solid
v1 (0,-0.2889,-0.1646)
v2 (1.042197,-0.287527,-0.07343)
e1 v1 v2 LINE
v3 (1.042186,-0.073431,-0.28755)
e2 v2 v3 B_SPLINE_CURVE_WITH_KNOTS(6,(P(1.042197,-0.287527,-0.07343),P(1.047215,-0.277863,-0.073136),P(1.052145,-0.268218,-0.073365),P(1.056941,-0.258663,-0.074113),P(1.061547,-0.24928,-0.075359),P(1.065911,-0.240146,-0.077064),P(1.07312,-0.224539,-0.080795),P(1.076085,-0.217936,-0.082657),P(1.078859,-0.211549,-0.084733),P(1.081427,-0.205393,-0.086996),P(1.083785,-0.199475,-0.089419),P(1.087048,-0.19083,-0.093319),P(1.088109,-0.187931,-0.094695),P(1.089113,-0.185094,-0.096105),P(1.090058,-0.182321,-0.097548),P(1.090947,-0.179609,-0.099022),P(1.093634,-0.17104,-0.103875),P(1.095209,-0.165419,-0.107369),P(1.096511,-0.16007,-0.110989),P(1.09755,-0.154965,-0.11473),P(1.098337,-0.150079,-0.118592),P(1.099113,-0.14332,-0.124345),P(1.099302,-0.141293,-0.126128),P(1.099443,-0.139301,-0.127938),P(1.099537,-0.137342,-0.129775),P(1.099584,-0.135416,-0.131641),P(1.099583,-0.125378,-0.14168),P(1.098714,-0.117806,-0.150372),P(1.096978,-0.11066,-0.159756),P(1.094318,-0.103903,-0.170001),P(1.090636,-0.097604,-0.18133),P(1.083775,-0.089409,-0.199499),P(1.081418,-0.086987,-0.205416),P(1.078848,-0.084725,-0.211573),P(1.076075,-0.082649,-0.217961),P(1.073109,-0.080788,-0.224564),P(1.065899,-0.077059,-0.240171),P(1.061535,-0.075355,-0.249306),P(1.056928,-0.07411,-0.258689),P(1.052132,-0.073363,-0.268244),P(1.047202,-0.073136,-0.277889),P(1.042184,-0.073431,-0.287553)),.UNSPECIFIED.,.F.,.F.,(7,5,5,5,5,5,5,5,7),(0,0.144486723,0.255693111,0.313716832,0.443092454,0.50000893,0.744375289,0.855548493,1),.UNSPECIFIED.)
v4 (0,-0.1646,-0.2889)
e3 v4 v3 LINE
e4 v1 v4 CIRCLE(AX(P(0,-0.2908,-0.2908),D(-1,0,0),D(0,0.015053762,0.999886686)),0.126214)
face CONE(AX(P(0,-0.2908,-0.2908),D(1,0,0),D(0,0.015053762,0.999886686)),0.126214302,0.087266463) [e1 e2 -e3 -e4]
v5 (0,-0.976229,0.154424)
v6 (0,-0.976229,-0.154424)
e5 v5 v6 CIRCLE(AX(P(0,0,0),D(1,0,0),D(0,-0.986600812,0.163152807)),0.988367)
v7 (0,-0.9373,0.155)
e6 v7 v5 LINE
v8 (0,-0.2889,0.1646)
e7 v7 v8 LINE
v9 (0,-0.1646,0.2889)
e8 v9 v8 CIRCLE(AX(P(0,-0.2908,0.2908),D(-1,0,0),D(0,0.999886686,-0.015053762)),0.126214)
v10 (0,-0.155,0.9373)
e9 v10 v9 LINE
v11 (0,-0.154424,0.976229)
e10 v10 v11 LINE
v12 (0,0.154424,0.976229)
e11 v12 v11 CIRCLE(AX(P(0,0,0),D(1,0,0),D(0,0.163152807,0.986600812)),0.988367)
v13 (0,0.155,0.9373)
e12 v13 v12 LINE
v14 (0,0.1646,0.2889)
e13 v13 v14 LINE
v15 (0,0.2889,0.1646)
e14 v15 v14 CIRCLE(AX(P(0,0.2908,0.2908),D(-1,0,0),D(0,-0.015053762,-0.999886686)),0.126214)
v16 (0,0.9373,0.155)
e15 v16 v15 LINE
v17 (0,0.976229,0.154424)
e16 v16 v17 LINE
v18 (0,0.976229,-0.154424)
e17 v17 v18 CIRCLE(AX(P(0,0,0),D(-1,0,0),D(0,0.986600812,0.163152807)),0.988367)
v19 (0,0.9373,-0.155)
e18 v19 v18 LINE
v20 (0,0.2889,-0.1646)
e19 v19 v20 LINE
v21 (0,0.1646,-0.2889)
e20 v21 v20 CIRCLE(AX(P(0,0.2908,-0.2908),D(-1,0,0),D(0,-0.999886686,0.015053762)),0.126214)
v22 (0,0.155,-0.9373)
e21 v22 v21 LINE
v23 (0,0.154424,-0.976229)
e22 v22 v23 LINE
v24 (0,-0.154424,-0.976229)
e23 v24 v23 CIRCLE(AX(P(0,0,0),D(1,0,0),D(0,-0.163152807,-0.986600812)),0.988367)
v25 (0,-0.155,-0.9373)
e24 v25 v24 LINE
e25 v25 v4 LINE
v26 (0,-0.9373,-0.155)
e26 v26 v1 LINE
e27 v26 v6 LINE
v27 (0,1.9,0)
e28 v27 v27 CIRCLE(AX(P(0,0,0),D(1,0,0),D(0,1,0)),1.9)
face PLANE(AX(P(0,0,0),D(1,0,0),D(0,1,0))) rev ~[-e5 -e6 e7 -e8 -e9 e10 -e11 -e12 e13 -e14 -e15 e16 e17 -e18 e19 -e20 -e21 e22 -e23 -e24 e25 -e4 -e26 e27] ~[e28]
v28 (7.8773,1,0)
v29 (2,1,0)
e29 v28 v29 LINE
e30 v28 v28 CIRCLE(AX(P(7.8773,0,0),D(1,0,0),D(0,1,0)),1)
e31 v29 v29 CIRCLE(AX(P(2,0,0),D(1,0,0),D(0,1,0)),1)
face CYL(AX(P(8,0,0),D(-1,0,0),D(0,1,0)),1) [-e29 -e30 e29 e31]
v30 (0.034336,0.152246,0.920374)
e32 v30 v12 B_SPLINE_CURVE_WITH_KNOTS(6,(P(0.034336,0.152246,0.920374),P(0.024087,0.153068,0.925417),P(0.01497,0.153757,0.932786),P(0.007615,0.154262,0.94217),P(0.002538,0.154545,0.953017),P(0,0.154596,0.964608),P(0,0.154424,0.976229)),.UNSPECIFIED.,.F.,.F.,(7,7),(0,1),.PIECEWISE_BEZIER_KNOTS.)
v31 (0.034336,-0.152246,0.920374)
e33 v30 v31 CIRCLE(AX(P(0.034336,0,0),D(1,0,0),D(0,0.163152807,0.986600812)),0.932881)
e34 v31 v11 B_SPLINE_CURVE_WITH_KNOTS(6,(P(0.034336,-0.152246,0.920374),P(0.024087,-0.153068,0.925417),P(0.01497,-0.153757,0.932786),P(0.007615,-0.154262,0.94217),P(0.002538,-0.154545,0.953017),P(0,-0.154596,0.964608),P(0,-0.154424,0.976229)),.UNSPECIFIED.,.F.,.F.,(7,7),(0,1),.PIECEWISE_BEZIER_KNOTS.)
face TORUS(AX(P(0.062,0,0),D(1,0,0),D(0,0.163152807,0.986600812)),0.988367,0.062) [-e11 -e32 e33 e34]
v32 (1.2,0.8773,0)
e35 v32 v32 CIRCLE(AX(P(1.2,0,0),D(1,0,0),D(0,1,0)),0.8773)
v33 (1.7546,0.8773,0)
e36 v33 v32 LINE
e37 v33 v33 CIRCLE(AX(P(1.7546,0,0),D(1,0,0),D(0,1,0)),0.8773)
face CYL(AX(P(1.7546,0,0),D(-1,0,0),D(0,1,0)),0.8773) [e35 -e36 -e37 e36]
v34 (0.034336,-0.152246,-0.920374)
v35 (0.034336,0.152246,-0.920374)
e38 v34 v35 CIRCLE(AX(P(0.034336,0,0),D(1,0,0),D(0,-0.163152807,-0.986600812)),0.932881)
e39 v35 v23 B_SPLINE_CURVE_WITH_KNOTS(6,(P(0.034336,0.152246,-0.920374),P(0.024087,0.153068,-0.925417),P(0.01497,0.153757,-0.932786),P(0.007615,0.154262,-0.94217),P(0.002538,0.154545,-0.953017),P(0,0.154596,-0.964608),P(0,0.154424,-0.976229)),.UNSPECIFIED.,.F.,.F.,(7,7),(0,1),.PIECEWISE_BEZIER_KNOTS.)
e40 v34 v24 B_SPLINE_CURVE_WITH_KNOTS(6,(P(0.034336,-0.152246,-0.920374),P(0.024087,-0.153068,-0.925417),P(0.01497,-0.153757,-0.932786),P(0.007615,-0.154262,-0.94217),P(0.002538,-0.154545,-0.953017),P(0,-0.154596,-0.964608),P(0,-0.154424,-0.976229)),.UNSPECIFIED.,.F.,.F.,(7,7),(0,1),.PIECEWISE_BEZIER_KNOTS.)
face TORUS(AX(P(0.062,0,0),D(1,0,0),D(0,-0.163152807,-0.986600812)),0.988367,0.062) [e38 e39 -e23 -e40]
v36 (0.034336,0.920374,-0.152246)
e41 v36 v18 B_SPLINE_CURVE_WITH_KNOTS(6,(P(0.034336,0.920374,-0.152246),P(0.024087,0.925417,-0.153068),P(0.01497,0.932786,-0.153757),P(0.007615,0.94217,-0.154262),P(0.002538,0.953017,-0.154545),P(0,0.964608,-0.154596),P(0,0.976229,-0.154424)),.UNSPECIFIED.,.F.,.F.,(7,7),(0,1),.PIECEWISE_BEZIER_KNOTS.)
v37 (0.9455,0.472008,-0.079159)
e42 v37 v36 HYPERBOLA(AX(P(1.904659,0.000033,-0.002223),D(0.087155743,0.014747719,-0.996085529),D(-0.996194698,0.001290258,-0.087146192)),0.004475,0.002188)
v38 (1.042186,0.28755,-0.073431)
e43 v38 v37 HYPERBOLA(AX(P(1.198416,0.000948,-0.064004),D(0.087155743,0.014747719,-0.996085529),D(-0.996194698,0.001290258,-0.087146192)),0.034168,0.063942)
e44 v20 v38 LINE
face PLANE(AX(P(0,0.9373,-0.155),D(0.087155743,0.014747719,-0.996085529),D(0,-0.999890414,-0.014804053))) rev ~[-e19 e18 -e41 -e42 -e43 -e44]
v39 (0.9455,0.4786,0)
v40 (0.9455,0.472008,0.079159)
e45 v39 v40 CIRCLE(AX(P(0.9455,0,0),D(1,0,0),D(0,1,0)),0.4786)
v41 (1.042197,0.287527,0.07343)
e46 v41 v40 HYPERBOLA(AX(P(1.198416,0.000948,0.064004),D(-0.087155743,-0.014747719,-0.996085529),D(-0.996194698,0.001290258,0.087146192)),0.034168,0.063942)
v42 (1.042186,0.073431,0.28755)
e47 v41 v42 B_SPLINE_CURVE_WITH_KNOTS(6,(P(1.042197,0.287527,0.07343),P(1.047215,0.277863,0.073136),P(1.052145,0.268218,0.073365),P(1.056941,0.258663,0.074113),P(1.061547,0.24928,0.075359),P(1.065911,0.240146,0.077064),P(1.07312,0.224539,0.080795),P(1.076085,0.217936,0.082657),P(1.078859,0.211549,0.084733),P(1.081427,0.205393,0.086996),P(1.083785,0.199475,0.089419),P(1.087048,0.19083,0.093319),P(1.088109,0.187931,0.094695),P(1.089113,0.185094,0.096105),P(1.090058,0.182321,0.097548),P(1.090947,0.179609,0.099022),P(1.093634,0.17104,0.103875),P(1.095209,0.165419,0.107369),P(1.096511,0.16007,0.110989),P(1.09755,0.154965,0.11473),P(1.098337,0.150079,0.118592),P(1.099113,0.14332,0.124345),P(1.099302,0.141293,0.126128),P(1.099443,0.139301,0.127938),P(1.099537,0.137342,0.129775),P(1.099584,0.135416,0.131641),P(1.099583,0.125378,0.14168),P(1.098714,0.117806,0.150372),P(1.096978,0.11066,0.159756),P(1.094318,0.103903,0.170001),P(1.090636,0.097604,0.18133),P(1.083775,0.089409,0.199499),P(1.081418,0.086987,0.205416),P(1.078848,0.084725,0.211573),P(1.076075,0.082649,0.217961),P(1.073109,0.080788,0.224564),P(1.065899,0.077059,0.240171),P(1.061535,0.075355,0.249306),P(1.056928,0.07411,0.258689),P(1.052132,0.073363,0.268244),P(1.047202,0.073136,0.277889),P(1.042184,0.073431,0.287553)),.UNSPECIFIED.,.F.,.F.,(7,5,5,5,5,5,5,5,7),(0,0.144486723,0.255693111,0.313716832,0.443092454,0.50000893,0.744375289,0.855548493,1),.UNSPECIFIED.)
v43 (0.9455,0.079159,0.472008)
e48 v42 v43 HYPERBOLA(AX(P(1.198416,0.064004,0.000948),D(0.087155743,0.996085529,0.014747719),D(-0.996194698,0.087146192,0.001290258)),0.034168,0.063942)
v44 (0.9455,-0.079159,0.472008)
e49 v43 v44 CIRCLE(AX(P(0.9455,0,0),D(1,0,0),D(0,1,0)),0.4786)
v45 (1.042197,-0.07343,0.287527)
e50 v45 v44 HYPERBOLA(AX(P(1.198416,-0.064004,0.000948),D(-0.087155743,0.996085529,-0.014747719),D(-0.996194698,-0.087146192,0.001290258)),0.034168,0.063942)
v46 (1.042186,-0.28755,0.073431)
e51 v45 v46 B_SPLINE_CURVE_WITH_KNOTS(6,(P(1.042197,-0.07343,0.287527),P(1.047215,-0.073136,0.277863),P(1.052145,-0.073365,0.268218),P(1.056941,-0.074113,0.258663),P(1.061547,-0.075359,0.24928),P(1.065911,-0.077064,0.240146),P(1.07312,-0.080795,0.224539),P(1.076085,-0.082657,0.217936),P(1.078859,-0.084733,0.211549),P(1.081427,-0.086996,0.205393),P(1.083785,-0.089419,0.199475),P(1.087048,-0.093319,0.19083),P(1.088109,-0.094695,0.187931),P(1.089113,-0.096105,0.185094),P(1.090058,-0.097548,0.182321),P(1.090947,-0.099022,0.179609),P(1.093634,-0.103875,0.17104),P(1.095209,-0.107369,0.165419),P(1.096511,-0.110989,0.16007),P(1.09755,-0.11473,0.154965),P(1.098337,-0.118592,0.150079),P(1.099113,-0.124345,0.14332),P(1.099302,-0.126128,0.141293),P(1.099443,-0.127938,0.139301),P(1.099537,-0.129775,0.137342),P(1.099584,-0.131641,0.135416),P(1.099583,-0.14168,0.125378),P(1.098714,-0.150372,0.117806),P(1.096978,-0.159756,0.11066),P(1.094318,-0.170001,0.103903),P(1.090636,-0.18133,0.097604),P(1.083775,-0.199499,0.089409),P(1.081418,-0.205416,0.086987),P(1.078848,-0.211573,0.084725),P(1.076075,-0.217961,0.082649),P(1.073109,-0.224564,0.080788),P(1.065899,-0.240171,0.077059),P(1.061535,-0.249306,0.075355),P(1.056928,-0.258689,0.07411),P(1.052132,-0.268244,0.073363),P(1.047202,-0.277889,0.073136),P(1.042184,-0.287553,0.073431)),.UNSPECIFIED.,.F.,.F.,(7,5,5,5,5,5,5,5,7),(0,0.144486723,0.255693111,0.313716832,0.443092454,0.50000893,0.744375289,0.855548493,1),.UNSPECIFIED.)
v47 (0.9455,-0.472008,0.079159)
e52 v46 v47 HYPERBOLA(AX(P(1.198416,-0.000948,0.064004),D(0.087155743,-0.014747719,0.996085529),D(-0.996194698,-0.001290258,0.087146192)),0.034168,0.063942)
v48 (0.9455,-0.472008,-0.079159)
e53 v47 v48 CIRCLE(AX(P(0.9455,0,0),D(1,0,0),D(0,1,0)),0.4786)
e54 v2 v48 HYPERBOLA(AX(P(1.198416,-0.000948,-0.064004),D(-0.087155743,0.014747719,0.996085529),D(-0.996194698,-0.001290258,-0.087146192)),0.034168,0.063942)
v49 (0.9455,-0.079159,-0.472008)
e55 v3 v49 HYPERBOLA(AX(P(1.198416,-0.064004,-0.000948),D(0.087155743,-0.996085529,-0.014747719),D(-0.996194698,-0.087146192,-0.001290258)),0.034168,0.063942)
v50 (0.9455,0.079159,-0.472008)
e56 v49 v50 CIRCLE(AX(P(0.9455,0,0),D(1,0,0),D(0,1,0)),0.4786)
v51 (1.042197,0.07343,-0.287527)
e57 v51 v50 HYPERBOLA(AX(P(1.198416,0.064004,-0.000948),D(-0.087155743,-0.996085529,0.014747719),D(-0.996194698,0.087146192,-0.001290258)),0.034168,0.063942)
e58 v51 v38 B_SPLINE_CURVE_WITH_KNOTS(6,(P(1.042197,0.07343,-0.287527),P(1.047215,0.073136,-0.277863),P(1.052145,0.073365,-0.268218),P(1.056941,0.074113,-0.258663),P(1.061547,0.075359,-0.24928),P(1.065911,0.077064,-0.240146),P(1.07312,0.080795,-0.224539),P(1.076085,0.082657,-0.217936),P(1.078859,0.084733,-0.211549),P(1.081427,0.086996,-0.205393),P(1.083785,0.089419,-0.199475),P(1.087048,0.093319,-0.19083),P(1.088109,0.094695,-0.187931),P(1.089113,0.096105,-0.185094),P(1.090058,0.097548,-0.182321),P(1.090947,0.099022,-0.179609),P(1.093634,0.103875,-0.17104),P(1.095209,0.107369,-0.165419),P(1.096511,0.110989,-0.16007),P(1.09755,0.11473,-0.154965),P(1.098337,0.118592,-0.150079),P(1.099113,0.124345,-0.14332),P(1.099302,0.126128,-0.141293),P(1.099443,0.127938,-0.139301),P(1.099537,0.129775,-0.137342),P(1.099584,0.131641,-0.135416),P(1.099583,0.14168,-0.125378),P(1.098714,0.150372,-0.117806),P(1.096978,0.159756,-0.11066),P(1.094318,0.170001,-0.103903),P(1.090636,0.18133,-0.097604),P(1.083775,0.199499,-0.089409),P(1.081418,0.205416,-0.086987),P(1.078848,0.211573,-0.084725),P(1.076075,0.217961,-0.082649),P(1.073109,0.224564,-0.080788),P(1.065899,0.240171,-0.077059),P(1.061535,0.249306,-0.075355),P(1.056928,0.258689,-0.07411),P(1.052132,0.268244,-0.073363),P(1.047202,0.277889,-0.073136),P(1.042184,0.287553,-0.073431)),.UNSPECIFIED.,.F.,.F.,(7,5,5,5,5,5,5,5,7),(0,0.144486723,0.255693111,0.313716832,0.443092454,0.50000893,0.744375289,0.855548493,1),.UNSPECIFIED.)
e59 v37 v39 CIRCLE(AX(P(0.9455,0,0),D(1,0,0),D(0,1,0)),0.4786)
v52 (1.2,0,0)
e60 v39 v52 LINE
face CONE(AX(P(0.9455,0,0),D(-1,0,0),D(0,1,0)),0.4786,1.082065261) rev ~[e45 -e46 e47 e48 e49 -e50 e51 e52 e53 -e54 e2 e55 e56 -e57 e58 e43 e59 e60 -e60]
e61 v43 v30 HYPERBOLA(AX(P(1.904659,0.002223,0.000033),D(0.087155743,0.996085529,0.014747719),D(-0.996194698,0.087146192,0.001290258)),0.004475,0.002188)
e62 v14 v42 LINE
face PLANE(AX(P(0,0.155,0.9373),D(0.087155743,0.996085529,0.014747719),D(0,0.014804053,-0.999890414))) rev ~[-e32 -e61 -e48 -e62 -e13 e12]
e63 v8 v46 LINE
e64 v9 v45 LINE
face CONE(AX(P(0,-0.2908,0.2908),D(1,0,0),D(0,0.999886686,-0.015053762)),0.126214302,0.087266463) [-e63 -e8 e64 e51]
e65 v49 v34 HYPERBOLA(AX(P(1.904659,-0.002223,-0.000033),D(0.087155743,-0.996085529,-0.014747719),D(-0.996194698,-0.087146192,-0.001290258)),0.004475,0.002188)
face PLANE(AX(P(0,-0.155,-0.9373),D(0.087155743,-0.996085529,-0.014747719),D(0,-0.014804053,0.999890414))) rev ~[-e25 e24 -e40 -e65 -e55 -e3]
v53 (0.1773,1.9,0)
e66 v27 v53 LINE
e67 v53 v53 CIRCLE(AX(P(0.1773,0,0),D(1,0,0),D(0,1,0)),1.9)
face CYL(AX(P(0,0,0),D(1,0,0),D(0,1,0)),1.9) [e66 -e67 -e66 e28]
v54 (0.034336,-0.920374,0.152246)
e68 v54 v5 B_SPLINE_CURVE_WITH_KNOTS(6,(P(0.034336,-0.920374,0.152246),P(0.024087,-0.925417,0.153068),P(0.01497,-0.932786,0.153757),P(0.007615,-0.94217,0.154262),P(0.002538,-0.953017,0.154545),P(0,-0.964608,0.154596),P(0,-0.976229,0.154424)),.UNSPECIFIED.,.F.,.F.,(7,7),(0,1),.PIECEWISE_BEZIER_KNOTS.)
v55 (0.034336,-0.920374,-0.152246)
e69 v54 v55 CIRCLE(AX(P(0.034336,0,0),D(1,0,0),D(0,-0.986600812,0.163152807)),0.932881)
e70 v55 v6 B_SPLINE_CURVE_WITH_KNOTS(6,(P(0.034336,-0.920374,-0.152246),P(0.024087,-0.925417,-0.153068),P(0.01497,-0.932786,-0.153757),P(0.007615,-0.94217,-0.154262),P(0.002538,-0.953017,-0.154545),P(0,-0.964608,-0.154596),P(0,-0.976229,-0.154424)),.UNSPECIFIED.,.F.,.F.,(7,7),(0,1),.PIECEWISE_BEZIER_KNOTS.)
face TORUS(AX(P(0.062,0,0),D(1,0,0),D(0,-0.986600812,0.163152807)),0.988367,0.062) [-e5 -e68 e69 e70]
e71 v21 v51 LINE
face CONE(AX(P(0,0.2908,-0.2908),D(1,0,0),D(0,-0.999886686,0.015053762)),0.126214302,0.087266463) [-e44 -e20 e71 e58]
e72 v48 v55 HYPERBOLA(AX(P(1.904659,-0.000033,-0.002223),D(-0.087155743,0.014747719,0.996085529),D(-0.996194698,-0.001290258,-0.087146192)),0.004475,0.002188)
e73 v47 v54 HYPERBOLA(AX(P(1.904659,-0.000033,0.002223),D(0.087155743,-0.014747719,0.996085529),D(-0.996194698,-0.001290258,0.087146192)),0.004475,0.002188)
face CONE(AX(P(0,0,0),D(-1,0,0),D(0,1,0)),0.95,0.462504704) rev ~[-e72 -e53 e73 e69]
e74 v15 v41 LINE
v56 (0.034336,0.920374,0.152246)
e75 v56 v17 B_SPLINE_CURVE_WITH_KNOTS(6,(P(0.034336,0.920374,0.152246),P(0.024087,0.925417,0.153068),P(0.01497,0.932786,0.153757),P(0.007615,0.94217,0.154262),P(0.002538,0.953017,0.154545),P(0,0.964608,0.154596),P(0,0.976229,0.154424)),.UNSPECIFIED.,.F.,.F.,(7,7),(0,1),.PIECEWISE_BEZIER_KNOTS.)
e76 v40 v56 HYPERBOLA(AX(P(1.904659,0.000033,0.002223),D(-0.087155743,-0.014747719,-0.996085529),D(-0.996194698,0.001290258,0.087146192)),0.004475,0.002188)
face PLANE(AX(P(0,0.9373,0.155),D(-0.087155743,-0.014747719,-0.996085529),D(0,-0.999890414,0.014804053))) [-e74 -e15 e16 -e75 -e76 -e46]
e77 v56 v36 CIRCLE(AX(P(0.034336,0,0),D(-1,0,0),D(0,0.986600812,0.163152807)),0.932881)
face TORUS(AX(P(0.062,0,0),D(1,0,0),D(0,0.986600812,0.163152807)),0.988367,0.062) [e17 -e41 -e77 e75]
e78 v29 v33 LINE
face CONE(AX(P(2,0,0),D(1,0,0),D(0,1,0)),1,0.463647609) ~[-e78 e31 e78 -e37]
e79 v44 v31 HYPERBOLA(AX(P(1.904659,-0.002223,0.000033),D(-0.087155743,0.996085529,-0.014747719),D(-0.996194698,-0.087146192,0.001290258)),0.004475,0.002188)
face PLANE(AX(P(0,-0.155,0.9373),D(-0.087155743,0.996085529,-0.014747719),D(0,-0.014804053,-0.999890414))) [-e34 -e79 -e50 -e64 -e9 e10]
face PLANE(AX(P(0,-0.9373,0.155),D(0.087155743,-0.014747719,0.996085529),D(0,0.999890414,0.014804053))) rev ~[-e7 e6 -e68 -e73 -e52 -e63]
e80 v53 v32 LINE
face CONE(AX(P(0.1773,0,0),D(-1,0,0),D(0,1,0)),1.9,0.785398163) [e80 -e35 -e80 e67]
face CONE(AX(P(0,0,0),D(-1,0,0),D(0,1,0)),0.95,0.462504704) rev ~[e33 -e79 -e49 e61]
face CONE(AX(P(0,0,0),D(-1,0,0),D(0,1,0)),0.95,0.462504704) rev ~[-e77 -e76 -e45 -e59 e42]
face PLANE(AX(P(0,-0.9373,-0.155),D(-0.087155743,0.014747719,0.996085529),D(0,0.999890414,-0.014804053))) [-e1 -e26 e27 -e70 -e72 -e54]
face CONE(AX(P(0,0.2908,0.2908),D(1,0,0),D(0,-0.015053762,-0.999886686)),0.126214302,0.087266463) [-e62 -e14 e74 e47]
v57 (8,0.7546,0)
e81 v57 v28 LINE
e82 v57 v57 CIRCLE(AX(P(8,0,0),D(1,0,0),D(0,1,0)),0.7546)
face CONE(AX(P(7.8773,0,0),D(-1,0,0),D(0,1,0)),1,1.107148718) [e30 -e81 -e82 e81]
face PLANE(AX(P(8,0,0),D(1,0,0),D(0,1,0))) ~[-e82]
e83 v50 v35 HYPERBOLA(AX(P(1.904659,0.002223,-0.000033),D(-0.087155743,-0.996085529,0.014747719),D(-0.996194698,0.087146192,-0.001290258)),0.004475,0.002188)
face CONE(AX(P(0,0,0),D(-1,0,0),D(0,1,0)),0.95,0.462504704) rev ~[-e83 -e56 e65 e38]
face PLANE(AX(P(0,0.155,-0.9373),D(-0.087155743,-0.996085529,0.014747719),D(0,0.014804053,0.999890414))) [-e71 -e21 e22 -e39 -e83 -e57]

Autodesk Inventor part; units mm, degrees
ref_plane "YZ Plane" through (0, 0, 0) normal (1, 0, 0) x (0, 1, 0)
ref_plane "XZ Plane" through (0, 0, 0) normal (0, 1, 0) x (-1, 0, 0)
sketch "Sketch1" plane through (0, 0, 0) normal (0, 0, 1) x (1, 0, 0)
  line L0 (1.2, 0) -> (8, 0)
  line L1 (8, 0) -> (8, 1)
  line L2 (8, 1) -> (2, 1)
  line L3 (2, 1) -> (1.7546, 0.8773)
  line L4 (1.7546, 0.8773) -> (1.2, 0.8773)
  line L5 (0, 1.9) -> (0, 0.95)
  line L6 (0, 0.95) -> (0.9455, 0.4786)
  line L7 (0.9455, 0.4786) -> (1.2, 0)
  line L8 (-1.6, 0) -> (9.6, 0) projected
  line L9 (0, -0.38) -> (0, 2.28) projected
  line L10 (0, 1.9) -> (0.1773, 1.9)
  line L11 (0.1773, 1.9) -> (1.2, 0.8773)
  line L12 (2, 1) -> (1.0773, 1) construction
  dimension "d1" = 6
  dimension "d2" = 2
  dimension "d3" = 1.7546
  dimension "d4" = 1.9
  dimension "d5" = 26.5
  dimension "d6" = 62
  dimension "d7" = 1.2
  dimension "d8" = 0.2454
  dimension "d12" = 3.8
  dimension "d13" = 45
  dimension "d15" = 8
  dimension "d24" = 1.2
revolve "Body" add sketch "Sketch1" angle 360 about axis through (1.2, 0, 0) along (1, 0, 0) contours L7 L6 L5 L10 L11 L4 L3 L2 L1 L0
sketch "Sketch2" plane through (0, 0, 0) normal (-1, 0, 0) x (0, 0, 1)
  line L0 (0, 0.95) -> (0, 0) construction
  line L1 (0, 0) -> (0.95, 0) construction
  arc A0 (0.285, 0) -> (0, 0.285) centre (0, 0) ccw construction
  arc A1 (0.3325, 0) -> (0, 0.3325) centre (0, 0) ccw construction
  arc A2 (0.9373, 0.155) -> (0.155, 0.9373) centre (0, 0) ccw
  line L2 (0, 0) -> (0.6718, 0.6718) construction
  line L3 (0.155, 0.9373) -> (0.1646, 0.2889)
  line L4 (0.9373, 0.155) -> (0.2889, 0.1646)
  arc A3 (0.155, 0.9373) -> (0, 0.95) centre (0, 0) ccw
  arc A4 (0.95, 0) -> (0.9373, 0.155) centre (0, 0) ccw
  line L5 (0, -2.66) -> (0, 2.66) projected
  line L6 (-2.66, 0) -> (2.66, 0) projected
  arc A5 (0.155, -0.9373) -> (0.9373, -0.155) centre (0, 0) ccw
  line L7 (0.155, -0.9373) -> (0.1646, -0.2889)
  line L8 (0.9373, -0.155) -> (0.2889, -0.1646)
  arc A6 (0, -0.95) -> (0.155, -0.9373) centre (0, 0) ccw
  arc A7 (0.9373, -0.155) -> (0.95, 0) centre (0, 0) ccw
  arc A8 (-0.155, 0.9373) -> (-0.9373, 0.155) centre (0, 0) ccw
  line L9 (-0.155, 0.9373) -> (-0.1646, 0.2889)
  line L10 (-0.9373, 0.155) -> (-0.2889, 0.1646)
  arc A9 (0, 0.95) -> (-0.155, 0.9373) centre (0, 0) ccw
  arc A10 (-0.9373, 0.155) -> (-0.95, 0) centre (0, 0) ccw
  arc A11 (-0.155, -0.9373) -> (0, -0.95) centre (0, 0) ccw
  arc A12 (-0.9373, -0.155) -> (-0.155, -0.9373) centre (0, 0) ccw
  arc A13 (-0.95, 0) -> (-0.9373, -0.155) centre (0, 0) ccw
  line L11 (-0.9373, -0.155) -> (-0.2889, -0.1646)
  line L12 (-0.155, -0.9373) -> (-0.1646, -0.2889)
  arc A14 (0.1646, 0.2889) -> (0.2889, 0.1646) centre (0.2908, 0.2908) ccw
  arc A15 (0.2889, -0.1646) -> (0.1646, -0.2889) centre (0.2908, -0.2908) ccw
  arc A16 (-0.2889, 0.1646) -> (-0.1646, 0.2889) centre (-0.2908, 0.2908) ccw
  arc A17 (-0.1646, -0.2889) -> (-0.2889, -0.1646) centre (-0.2908, -0.2908) ccw
  point P0 (0.6718, -0.6718)
  point P1 (-0.6718, 0.6718)
  point P2 (-0.6718, -0.6718)
  dimension "d17" = 0.57
  dimension "d18" = 0.665
  dimension "d19" = 1.9
  dimension "d20" = 45
  dimension "d21" = 0.155
extrude "Slot" add sketch "Sketch2" against normal up to next draft 5 contours L4 A14 L3 A2 | A5 L7 A15 L8 | L9 A16 L10 A8 | A12 L11 A17 L12
fillet "Fillet1" radius 0.062 4 edges at (0, 0.95, 0) (0, 0, -0.95) (0, -0.95, 0) (0, 0, 0.95)
thread "Thread" size "M2x0.4" class "6g" standard "ISO Metric profile" length 6
chamfer "Chamfer1" distance 0.2454 distance2 0.1227 1 edges at (8, -1, 0) measured on face at (8, -0.1182, -0.3117)
ref_plane "Work Plane2" through (3.35, 0, 0) normal (0, 0, -1) x (1, 0, 0)
equation "\"d1\" = GEL"
equation "\"d2\" = GD"
equation "\"d3\" = BDM"
equation "\"d4\" = SDM"
equation "\"d7\" = INTI"
equation "\"d8\" = GAL"
equation "\"d12\" = KOD"
equation "\"d13\" = 0.5 * SEWI"
equation "\"d15\" = NLG"
equation "\"d24\" = KOH"
equation "\"d17\" = 0.3 * SDM"
equation "\"d18\" = 0.35 * SDM"
equation "\"d19\" = SDM"
equation "\"d21\" = 0.5 * SBR"
equation "\"d23\" = 0.2 * SBR"
equation "\"d10\" = GEL"
equation "\"d25\" = -0.5 * SPD + 0.5 * GD"
equation "\"d26\" = 0.5 * GAL"
equation "\"NLG\" = 8"
equation "\"GEL\" = 6"
equation "\"GAL\" = 0.61345 * PTC"
equation "\"SPD\" = NND - 1.2269 * PTC"
equation "\"KOD\" = 3.8"
equation "\"KOH\" = 1.2"
equation "\"SBR\" = 0.31"
equation "\"INTI\" = 1.2"
equation "\"SDM\" = 1.9"
equation "\"GD\" = NND"
equation "\"BDM\" = NND - GAL"
equation "\"SEWI\" = 90deg"
equation "\"d9\" = SDM"
equation "\"GUL\" = 0.61345 * PTC"
equation "\"TOA\" = 30deg"
equation "\"EPV\" = 2.2"
equation "\"THREADDIA\" = 2"
equation "\"PTC\" = 0.4"
equation "\"NND\" = 2"
equation "\"GD1\" = THREADDIA - 1.2269 * PTC"
properties part number "ISO 7046-1 - M2 x 8 - 4.8 - H" material "Steel"
